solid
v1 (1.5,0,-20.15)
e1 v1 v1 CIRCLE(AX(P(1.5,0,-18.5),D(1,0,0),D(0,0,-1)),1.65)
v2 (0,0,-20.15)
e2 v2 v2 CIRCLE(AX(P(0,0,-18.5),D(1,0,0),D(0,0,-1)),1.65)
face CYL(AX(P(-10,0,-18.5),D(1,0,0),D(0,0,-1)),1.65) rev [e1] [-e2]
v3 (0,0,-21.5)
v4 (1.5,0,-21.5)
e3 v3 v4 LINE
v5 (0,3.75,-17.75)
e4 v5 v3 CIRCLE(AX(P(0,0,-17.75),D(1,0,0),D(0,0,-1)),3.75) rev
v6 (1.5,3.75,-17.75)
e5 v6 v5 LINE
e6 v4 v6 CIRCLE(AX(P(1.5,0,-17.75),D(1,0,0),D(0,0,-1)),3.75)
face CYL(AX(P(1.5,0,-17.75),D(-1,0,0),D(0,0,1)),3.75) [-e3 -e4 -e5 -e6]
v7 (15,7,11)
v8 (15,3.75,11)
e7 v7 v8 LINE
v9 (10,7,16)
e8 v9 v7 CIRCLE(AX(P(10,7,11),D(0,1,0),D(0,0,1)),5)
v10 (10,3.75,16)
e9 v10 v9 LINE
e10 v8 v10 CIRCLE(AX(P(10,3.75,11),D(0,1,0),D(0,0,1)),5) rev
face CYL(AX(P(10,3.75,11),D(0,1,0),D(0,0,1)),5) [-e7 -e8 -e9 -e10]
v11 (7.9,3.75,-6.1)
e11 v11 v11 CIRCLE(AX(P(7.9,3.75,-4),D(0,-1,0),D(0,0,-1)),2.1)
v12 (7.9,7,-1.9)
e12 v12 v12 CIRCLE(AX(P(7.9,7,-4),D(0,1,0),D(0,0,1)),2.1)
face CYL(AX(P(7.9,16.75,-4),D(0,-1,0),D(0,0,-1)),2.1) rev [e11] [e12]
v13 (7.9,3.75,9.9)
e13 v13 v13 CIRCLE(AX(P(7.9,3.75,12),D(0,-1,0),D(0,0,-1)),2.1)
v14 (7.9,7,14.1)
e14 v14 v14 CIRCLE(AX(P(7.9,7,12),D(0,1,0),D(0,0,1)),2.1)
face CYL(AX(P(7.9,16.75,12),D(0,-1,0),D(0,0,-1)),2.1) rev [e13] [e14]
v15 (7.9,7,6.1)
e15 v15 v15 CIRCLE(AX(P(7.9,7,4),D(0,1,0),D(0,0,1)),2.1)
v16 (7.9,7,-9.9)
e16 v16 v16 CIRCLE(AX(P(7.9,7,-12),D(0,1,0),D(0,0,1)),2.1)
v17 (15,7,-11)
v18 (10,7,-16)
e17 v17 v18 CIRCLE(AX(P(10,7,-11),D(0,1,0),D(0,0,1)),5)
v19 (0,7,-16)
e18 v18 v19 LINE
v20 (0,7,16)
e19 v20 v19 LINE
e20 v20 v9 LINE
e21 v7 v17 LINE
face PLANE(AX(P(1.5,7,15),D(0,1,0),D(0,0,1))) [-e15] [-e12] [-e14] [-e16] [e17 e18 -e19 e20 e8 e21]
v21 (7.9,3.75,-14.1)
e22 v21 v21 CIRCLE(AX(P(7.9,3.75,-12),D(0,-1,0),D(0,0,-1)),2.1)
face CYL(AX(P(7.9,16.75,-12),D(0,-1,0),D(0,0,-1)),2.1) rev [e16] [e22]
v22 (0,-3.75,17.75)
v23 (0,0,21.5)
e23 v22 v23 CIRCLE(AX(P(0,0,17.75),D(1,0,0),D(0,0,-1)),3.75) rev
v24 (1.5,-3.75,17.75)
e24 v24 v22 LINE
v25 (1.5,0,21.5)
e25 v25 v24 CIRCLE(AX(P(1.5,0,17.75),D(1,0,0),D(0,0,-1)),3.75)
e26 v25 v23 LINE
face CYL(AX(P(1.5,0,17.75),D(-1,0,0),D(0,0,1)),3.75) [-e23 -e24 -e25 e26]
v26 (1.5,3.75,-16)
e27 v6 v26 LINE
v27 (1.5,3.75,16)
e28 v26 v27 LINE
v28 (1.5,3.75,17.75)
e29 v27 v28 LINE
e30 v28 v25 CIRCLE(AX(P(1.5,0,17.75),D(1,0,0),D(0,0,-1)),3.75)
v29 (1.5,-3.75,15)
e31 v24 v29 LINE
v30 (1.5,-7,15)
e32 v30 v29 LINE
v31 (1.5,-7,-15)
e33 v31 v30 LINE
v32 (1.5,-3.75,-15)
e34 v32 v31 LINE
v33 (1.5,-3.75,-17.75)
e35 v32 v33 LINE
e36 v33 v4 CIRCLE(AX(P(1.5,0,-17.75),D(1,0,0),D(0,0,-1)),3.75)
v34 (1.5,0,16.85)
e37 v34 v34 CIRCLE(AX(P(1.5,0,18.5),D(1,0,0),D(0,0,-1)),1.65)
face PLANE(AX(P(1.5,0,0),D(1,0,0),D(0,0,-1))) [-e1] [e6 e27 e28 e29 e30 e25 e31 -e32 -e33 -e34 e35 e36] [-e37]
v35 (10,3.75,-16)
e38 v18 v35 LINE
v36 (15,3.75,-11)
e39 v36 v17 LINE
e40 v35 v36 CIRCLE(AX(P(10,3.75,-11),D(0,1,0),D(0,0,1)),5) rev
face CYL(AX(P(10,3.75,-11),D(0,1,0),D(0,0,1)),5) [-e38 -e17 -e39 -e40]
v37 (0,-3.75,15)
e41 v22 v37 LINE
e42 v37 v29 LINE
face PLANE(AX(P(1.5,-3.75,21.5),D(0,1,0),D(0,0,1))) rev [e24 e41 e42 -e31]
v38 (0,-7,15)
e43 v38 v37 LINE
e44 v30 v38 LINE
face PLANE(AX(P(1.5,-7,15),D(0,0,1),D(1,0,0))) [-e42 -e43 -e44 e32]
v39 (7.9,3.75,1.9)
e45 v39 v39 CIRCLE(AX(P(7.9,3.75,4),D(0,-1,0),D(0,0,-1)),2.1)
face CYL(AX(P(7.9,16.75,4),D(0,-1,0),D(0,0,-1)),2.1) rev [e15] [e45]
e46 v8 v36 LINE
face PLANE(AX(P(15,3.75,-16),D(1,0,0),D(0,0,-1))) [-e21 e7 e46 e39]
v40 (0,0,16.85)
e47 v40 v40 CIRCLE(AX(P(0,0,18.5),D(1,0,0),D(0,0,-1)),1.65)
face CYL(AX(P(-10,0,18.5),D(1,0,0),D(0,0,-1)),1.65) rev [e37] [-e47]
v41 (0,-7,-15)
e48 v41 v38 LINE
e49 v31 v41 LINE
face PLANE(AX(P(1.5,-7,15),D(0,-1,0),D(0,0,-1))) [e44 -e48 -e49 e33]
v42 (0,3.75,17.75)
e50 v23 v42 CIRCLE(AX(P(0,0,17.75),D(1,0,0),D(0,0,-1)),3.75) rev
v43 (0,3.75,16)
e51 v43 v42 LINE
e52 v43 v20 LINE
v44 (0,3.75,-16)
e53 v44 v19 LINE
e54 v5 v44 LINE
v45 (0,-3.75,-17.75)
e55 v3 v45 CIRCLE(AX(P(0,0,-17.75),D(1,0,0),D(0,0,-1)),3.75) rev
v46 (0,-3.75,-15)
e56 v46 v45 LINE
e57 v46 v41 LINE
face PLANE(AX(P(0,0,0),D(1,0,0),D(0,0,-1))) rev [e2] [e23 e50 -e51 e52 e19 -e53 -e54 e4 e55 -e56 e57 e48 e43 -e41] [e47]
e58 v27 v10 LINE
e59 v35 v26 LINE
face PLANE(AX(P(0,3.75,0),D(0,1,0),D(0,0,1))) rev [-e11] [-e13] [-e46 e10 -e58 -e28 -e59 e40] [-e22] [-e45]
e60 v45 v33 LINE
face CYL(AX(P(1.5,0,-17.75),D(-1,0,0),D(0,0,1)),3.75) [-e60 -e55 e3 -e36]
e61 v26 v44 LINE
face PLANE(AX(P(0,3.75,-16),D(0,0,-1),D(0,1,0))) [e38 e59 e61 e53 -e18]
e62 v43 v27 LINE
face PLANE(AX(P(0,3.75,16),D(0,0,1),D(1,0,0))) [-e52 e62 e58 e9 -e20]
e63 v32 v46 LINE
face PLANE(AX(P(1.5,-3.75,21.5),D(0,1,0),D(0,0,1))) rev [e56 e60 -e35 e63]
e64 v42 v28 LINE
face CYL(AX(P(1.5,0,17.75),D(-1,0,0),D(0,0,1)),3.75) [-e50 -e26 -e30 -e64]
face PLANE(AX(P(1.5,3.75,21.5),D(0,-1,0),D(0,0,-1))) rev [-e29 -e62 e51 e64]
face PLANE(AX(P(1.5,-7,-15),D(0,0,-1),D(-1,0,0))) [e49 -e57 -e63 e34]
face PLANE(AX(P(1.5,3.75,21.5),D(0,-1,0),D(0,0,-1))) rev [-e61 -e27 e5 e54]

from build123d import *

# Parameters (mm, degrees)
SKETCH_1_W          = 43
SKETCH_1_H          = 7.5
EXTRUDE_1_DEPTH     = 1.5
SKETCH_2_R          = 1.65
CUT_EXTRUDE_2_DEPTH = 11.5
FILLET_1_R          = 3.75
SKETCH_3_W          = 30
SKETCH_3_H          = 14
EXTRUDE_3_DEPTH     = 1.5
SKETCH_4_W          = 15
SKETCH_4_H          = 32
EXTRUDE_4_DEPTH     = 3.25
SKETCH_5_R          = 2.1
CUT_EXTRUDE_3_DEPTH = 13
FILLET_3_R          = 5


with BuildPart() as part:
    # 草圖1 → 填料-伸長1 (new body)
    with BuildSketch(Plane(origin=(0, 0, 0), x_dir=(0, 0, -1), z_dir=(1, 0, 0))):
        Rectangle(SKETCH_1_W, SKETCH_1_H)
    extrude(amount=EXTRUDE_1_DEPTH)

    # 草圖2 → 除料-伸長2 (cut)
    with BuildSketch(Plane(origin=(1.5, 0, 0), x_dir=(0, 0, -1), z_dir=(1, 0, 0))):
        with Locations((-18.5, 0)):
            Circle(SKETCH_2_R)
        with Locations((18.5, 0)):
            Circle(SKETCH_2_R)
    extrude(amount=-CUT_EXTRUDE_2_DEPTH, mode=Mode.SUBTRACT)

    # 圓角1
    fillet_1_edges = [part.edges().sort_by_distance(p)[0] for p in [
        (0.75, -3.75, -21.5),
        (0.75, 3.75, -21.5),
        (0.75, -3.75, 21.5),
        (0.75, 3.75, 21.5),
    ]]
    fillet(fillet_1_edges, radius=FILLET_1_R - 0.0001)  # a hair under: the kernel refuses the full size

    # 草圖3 → 填料-伸長3 (add)
    with BuildSketch(Plane.ZY):
        Rectangle(SKETCH_3_W, SKETCH_3_H)
    extrude(amount=-EXTRUDE_3_DEPTH)

    # 草圖4 → 填料-伸長4 (add)
    with BuildSketch(Plane(origin=(0, 7, 0), x_dir=(1, 0, 0), z_dir=(0, 1, 0))):
        with Locations((7.5, 0)):
            Rectangle(SKETCH_4_W, SKETCH_4_H)
    extrude(amount=-EXTRUDE_4_DEPTH)

    # 草圖5 → 除料-伸長3 (cut)
    with BuildSketch(Plane.XZ.offset(-3.75)):
        with Locations(Location((7.9, 12, 0), (0, 0, 270))):
            Circle(SKETCH_5_R)
        with Locations(Location((7.9, 4, 0), (0, 0, 270))):
            Circle(SKETCH_5_R)
        with Locations(Location((7.9, -4, 0), (0, 0, 270))):
            Circle(SKETCH_5_R)
        with Locations(Location((7.9, -12, 0), (0, 0, 270))):
            Circle(SKETCH_5_R)
    extrude(amount=-CUT_EXTRUDE_3_DEPTH, mode=Mode.SUBTRACT)

    # 圓角3
    fillet_3_edges = [part.edges().sort_by_distance(p)[0] for p in [
        (15, 5.375, -16),
        (15, 5.375, 16),
    ]]
    fillet(fillet_3_edges, radius=FILLET_3_R)


solid = part.part
